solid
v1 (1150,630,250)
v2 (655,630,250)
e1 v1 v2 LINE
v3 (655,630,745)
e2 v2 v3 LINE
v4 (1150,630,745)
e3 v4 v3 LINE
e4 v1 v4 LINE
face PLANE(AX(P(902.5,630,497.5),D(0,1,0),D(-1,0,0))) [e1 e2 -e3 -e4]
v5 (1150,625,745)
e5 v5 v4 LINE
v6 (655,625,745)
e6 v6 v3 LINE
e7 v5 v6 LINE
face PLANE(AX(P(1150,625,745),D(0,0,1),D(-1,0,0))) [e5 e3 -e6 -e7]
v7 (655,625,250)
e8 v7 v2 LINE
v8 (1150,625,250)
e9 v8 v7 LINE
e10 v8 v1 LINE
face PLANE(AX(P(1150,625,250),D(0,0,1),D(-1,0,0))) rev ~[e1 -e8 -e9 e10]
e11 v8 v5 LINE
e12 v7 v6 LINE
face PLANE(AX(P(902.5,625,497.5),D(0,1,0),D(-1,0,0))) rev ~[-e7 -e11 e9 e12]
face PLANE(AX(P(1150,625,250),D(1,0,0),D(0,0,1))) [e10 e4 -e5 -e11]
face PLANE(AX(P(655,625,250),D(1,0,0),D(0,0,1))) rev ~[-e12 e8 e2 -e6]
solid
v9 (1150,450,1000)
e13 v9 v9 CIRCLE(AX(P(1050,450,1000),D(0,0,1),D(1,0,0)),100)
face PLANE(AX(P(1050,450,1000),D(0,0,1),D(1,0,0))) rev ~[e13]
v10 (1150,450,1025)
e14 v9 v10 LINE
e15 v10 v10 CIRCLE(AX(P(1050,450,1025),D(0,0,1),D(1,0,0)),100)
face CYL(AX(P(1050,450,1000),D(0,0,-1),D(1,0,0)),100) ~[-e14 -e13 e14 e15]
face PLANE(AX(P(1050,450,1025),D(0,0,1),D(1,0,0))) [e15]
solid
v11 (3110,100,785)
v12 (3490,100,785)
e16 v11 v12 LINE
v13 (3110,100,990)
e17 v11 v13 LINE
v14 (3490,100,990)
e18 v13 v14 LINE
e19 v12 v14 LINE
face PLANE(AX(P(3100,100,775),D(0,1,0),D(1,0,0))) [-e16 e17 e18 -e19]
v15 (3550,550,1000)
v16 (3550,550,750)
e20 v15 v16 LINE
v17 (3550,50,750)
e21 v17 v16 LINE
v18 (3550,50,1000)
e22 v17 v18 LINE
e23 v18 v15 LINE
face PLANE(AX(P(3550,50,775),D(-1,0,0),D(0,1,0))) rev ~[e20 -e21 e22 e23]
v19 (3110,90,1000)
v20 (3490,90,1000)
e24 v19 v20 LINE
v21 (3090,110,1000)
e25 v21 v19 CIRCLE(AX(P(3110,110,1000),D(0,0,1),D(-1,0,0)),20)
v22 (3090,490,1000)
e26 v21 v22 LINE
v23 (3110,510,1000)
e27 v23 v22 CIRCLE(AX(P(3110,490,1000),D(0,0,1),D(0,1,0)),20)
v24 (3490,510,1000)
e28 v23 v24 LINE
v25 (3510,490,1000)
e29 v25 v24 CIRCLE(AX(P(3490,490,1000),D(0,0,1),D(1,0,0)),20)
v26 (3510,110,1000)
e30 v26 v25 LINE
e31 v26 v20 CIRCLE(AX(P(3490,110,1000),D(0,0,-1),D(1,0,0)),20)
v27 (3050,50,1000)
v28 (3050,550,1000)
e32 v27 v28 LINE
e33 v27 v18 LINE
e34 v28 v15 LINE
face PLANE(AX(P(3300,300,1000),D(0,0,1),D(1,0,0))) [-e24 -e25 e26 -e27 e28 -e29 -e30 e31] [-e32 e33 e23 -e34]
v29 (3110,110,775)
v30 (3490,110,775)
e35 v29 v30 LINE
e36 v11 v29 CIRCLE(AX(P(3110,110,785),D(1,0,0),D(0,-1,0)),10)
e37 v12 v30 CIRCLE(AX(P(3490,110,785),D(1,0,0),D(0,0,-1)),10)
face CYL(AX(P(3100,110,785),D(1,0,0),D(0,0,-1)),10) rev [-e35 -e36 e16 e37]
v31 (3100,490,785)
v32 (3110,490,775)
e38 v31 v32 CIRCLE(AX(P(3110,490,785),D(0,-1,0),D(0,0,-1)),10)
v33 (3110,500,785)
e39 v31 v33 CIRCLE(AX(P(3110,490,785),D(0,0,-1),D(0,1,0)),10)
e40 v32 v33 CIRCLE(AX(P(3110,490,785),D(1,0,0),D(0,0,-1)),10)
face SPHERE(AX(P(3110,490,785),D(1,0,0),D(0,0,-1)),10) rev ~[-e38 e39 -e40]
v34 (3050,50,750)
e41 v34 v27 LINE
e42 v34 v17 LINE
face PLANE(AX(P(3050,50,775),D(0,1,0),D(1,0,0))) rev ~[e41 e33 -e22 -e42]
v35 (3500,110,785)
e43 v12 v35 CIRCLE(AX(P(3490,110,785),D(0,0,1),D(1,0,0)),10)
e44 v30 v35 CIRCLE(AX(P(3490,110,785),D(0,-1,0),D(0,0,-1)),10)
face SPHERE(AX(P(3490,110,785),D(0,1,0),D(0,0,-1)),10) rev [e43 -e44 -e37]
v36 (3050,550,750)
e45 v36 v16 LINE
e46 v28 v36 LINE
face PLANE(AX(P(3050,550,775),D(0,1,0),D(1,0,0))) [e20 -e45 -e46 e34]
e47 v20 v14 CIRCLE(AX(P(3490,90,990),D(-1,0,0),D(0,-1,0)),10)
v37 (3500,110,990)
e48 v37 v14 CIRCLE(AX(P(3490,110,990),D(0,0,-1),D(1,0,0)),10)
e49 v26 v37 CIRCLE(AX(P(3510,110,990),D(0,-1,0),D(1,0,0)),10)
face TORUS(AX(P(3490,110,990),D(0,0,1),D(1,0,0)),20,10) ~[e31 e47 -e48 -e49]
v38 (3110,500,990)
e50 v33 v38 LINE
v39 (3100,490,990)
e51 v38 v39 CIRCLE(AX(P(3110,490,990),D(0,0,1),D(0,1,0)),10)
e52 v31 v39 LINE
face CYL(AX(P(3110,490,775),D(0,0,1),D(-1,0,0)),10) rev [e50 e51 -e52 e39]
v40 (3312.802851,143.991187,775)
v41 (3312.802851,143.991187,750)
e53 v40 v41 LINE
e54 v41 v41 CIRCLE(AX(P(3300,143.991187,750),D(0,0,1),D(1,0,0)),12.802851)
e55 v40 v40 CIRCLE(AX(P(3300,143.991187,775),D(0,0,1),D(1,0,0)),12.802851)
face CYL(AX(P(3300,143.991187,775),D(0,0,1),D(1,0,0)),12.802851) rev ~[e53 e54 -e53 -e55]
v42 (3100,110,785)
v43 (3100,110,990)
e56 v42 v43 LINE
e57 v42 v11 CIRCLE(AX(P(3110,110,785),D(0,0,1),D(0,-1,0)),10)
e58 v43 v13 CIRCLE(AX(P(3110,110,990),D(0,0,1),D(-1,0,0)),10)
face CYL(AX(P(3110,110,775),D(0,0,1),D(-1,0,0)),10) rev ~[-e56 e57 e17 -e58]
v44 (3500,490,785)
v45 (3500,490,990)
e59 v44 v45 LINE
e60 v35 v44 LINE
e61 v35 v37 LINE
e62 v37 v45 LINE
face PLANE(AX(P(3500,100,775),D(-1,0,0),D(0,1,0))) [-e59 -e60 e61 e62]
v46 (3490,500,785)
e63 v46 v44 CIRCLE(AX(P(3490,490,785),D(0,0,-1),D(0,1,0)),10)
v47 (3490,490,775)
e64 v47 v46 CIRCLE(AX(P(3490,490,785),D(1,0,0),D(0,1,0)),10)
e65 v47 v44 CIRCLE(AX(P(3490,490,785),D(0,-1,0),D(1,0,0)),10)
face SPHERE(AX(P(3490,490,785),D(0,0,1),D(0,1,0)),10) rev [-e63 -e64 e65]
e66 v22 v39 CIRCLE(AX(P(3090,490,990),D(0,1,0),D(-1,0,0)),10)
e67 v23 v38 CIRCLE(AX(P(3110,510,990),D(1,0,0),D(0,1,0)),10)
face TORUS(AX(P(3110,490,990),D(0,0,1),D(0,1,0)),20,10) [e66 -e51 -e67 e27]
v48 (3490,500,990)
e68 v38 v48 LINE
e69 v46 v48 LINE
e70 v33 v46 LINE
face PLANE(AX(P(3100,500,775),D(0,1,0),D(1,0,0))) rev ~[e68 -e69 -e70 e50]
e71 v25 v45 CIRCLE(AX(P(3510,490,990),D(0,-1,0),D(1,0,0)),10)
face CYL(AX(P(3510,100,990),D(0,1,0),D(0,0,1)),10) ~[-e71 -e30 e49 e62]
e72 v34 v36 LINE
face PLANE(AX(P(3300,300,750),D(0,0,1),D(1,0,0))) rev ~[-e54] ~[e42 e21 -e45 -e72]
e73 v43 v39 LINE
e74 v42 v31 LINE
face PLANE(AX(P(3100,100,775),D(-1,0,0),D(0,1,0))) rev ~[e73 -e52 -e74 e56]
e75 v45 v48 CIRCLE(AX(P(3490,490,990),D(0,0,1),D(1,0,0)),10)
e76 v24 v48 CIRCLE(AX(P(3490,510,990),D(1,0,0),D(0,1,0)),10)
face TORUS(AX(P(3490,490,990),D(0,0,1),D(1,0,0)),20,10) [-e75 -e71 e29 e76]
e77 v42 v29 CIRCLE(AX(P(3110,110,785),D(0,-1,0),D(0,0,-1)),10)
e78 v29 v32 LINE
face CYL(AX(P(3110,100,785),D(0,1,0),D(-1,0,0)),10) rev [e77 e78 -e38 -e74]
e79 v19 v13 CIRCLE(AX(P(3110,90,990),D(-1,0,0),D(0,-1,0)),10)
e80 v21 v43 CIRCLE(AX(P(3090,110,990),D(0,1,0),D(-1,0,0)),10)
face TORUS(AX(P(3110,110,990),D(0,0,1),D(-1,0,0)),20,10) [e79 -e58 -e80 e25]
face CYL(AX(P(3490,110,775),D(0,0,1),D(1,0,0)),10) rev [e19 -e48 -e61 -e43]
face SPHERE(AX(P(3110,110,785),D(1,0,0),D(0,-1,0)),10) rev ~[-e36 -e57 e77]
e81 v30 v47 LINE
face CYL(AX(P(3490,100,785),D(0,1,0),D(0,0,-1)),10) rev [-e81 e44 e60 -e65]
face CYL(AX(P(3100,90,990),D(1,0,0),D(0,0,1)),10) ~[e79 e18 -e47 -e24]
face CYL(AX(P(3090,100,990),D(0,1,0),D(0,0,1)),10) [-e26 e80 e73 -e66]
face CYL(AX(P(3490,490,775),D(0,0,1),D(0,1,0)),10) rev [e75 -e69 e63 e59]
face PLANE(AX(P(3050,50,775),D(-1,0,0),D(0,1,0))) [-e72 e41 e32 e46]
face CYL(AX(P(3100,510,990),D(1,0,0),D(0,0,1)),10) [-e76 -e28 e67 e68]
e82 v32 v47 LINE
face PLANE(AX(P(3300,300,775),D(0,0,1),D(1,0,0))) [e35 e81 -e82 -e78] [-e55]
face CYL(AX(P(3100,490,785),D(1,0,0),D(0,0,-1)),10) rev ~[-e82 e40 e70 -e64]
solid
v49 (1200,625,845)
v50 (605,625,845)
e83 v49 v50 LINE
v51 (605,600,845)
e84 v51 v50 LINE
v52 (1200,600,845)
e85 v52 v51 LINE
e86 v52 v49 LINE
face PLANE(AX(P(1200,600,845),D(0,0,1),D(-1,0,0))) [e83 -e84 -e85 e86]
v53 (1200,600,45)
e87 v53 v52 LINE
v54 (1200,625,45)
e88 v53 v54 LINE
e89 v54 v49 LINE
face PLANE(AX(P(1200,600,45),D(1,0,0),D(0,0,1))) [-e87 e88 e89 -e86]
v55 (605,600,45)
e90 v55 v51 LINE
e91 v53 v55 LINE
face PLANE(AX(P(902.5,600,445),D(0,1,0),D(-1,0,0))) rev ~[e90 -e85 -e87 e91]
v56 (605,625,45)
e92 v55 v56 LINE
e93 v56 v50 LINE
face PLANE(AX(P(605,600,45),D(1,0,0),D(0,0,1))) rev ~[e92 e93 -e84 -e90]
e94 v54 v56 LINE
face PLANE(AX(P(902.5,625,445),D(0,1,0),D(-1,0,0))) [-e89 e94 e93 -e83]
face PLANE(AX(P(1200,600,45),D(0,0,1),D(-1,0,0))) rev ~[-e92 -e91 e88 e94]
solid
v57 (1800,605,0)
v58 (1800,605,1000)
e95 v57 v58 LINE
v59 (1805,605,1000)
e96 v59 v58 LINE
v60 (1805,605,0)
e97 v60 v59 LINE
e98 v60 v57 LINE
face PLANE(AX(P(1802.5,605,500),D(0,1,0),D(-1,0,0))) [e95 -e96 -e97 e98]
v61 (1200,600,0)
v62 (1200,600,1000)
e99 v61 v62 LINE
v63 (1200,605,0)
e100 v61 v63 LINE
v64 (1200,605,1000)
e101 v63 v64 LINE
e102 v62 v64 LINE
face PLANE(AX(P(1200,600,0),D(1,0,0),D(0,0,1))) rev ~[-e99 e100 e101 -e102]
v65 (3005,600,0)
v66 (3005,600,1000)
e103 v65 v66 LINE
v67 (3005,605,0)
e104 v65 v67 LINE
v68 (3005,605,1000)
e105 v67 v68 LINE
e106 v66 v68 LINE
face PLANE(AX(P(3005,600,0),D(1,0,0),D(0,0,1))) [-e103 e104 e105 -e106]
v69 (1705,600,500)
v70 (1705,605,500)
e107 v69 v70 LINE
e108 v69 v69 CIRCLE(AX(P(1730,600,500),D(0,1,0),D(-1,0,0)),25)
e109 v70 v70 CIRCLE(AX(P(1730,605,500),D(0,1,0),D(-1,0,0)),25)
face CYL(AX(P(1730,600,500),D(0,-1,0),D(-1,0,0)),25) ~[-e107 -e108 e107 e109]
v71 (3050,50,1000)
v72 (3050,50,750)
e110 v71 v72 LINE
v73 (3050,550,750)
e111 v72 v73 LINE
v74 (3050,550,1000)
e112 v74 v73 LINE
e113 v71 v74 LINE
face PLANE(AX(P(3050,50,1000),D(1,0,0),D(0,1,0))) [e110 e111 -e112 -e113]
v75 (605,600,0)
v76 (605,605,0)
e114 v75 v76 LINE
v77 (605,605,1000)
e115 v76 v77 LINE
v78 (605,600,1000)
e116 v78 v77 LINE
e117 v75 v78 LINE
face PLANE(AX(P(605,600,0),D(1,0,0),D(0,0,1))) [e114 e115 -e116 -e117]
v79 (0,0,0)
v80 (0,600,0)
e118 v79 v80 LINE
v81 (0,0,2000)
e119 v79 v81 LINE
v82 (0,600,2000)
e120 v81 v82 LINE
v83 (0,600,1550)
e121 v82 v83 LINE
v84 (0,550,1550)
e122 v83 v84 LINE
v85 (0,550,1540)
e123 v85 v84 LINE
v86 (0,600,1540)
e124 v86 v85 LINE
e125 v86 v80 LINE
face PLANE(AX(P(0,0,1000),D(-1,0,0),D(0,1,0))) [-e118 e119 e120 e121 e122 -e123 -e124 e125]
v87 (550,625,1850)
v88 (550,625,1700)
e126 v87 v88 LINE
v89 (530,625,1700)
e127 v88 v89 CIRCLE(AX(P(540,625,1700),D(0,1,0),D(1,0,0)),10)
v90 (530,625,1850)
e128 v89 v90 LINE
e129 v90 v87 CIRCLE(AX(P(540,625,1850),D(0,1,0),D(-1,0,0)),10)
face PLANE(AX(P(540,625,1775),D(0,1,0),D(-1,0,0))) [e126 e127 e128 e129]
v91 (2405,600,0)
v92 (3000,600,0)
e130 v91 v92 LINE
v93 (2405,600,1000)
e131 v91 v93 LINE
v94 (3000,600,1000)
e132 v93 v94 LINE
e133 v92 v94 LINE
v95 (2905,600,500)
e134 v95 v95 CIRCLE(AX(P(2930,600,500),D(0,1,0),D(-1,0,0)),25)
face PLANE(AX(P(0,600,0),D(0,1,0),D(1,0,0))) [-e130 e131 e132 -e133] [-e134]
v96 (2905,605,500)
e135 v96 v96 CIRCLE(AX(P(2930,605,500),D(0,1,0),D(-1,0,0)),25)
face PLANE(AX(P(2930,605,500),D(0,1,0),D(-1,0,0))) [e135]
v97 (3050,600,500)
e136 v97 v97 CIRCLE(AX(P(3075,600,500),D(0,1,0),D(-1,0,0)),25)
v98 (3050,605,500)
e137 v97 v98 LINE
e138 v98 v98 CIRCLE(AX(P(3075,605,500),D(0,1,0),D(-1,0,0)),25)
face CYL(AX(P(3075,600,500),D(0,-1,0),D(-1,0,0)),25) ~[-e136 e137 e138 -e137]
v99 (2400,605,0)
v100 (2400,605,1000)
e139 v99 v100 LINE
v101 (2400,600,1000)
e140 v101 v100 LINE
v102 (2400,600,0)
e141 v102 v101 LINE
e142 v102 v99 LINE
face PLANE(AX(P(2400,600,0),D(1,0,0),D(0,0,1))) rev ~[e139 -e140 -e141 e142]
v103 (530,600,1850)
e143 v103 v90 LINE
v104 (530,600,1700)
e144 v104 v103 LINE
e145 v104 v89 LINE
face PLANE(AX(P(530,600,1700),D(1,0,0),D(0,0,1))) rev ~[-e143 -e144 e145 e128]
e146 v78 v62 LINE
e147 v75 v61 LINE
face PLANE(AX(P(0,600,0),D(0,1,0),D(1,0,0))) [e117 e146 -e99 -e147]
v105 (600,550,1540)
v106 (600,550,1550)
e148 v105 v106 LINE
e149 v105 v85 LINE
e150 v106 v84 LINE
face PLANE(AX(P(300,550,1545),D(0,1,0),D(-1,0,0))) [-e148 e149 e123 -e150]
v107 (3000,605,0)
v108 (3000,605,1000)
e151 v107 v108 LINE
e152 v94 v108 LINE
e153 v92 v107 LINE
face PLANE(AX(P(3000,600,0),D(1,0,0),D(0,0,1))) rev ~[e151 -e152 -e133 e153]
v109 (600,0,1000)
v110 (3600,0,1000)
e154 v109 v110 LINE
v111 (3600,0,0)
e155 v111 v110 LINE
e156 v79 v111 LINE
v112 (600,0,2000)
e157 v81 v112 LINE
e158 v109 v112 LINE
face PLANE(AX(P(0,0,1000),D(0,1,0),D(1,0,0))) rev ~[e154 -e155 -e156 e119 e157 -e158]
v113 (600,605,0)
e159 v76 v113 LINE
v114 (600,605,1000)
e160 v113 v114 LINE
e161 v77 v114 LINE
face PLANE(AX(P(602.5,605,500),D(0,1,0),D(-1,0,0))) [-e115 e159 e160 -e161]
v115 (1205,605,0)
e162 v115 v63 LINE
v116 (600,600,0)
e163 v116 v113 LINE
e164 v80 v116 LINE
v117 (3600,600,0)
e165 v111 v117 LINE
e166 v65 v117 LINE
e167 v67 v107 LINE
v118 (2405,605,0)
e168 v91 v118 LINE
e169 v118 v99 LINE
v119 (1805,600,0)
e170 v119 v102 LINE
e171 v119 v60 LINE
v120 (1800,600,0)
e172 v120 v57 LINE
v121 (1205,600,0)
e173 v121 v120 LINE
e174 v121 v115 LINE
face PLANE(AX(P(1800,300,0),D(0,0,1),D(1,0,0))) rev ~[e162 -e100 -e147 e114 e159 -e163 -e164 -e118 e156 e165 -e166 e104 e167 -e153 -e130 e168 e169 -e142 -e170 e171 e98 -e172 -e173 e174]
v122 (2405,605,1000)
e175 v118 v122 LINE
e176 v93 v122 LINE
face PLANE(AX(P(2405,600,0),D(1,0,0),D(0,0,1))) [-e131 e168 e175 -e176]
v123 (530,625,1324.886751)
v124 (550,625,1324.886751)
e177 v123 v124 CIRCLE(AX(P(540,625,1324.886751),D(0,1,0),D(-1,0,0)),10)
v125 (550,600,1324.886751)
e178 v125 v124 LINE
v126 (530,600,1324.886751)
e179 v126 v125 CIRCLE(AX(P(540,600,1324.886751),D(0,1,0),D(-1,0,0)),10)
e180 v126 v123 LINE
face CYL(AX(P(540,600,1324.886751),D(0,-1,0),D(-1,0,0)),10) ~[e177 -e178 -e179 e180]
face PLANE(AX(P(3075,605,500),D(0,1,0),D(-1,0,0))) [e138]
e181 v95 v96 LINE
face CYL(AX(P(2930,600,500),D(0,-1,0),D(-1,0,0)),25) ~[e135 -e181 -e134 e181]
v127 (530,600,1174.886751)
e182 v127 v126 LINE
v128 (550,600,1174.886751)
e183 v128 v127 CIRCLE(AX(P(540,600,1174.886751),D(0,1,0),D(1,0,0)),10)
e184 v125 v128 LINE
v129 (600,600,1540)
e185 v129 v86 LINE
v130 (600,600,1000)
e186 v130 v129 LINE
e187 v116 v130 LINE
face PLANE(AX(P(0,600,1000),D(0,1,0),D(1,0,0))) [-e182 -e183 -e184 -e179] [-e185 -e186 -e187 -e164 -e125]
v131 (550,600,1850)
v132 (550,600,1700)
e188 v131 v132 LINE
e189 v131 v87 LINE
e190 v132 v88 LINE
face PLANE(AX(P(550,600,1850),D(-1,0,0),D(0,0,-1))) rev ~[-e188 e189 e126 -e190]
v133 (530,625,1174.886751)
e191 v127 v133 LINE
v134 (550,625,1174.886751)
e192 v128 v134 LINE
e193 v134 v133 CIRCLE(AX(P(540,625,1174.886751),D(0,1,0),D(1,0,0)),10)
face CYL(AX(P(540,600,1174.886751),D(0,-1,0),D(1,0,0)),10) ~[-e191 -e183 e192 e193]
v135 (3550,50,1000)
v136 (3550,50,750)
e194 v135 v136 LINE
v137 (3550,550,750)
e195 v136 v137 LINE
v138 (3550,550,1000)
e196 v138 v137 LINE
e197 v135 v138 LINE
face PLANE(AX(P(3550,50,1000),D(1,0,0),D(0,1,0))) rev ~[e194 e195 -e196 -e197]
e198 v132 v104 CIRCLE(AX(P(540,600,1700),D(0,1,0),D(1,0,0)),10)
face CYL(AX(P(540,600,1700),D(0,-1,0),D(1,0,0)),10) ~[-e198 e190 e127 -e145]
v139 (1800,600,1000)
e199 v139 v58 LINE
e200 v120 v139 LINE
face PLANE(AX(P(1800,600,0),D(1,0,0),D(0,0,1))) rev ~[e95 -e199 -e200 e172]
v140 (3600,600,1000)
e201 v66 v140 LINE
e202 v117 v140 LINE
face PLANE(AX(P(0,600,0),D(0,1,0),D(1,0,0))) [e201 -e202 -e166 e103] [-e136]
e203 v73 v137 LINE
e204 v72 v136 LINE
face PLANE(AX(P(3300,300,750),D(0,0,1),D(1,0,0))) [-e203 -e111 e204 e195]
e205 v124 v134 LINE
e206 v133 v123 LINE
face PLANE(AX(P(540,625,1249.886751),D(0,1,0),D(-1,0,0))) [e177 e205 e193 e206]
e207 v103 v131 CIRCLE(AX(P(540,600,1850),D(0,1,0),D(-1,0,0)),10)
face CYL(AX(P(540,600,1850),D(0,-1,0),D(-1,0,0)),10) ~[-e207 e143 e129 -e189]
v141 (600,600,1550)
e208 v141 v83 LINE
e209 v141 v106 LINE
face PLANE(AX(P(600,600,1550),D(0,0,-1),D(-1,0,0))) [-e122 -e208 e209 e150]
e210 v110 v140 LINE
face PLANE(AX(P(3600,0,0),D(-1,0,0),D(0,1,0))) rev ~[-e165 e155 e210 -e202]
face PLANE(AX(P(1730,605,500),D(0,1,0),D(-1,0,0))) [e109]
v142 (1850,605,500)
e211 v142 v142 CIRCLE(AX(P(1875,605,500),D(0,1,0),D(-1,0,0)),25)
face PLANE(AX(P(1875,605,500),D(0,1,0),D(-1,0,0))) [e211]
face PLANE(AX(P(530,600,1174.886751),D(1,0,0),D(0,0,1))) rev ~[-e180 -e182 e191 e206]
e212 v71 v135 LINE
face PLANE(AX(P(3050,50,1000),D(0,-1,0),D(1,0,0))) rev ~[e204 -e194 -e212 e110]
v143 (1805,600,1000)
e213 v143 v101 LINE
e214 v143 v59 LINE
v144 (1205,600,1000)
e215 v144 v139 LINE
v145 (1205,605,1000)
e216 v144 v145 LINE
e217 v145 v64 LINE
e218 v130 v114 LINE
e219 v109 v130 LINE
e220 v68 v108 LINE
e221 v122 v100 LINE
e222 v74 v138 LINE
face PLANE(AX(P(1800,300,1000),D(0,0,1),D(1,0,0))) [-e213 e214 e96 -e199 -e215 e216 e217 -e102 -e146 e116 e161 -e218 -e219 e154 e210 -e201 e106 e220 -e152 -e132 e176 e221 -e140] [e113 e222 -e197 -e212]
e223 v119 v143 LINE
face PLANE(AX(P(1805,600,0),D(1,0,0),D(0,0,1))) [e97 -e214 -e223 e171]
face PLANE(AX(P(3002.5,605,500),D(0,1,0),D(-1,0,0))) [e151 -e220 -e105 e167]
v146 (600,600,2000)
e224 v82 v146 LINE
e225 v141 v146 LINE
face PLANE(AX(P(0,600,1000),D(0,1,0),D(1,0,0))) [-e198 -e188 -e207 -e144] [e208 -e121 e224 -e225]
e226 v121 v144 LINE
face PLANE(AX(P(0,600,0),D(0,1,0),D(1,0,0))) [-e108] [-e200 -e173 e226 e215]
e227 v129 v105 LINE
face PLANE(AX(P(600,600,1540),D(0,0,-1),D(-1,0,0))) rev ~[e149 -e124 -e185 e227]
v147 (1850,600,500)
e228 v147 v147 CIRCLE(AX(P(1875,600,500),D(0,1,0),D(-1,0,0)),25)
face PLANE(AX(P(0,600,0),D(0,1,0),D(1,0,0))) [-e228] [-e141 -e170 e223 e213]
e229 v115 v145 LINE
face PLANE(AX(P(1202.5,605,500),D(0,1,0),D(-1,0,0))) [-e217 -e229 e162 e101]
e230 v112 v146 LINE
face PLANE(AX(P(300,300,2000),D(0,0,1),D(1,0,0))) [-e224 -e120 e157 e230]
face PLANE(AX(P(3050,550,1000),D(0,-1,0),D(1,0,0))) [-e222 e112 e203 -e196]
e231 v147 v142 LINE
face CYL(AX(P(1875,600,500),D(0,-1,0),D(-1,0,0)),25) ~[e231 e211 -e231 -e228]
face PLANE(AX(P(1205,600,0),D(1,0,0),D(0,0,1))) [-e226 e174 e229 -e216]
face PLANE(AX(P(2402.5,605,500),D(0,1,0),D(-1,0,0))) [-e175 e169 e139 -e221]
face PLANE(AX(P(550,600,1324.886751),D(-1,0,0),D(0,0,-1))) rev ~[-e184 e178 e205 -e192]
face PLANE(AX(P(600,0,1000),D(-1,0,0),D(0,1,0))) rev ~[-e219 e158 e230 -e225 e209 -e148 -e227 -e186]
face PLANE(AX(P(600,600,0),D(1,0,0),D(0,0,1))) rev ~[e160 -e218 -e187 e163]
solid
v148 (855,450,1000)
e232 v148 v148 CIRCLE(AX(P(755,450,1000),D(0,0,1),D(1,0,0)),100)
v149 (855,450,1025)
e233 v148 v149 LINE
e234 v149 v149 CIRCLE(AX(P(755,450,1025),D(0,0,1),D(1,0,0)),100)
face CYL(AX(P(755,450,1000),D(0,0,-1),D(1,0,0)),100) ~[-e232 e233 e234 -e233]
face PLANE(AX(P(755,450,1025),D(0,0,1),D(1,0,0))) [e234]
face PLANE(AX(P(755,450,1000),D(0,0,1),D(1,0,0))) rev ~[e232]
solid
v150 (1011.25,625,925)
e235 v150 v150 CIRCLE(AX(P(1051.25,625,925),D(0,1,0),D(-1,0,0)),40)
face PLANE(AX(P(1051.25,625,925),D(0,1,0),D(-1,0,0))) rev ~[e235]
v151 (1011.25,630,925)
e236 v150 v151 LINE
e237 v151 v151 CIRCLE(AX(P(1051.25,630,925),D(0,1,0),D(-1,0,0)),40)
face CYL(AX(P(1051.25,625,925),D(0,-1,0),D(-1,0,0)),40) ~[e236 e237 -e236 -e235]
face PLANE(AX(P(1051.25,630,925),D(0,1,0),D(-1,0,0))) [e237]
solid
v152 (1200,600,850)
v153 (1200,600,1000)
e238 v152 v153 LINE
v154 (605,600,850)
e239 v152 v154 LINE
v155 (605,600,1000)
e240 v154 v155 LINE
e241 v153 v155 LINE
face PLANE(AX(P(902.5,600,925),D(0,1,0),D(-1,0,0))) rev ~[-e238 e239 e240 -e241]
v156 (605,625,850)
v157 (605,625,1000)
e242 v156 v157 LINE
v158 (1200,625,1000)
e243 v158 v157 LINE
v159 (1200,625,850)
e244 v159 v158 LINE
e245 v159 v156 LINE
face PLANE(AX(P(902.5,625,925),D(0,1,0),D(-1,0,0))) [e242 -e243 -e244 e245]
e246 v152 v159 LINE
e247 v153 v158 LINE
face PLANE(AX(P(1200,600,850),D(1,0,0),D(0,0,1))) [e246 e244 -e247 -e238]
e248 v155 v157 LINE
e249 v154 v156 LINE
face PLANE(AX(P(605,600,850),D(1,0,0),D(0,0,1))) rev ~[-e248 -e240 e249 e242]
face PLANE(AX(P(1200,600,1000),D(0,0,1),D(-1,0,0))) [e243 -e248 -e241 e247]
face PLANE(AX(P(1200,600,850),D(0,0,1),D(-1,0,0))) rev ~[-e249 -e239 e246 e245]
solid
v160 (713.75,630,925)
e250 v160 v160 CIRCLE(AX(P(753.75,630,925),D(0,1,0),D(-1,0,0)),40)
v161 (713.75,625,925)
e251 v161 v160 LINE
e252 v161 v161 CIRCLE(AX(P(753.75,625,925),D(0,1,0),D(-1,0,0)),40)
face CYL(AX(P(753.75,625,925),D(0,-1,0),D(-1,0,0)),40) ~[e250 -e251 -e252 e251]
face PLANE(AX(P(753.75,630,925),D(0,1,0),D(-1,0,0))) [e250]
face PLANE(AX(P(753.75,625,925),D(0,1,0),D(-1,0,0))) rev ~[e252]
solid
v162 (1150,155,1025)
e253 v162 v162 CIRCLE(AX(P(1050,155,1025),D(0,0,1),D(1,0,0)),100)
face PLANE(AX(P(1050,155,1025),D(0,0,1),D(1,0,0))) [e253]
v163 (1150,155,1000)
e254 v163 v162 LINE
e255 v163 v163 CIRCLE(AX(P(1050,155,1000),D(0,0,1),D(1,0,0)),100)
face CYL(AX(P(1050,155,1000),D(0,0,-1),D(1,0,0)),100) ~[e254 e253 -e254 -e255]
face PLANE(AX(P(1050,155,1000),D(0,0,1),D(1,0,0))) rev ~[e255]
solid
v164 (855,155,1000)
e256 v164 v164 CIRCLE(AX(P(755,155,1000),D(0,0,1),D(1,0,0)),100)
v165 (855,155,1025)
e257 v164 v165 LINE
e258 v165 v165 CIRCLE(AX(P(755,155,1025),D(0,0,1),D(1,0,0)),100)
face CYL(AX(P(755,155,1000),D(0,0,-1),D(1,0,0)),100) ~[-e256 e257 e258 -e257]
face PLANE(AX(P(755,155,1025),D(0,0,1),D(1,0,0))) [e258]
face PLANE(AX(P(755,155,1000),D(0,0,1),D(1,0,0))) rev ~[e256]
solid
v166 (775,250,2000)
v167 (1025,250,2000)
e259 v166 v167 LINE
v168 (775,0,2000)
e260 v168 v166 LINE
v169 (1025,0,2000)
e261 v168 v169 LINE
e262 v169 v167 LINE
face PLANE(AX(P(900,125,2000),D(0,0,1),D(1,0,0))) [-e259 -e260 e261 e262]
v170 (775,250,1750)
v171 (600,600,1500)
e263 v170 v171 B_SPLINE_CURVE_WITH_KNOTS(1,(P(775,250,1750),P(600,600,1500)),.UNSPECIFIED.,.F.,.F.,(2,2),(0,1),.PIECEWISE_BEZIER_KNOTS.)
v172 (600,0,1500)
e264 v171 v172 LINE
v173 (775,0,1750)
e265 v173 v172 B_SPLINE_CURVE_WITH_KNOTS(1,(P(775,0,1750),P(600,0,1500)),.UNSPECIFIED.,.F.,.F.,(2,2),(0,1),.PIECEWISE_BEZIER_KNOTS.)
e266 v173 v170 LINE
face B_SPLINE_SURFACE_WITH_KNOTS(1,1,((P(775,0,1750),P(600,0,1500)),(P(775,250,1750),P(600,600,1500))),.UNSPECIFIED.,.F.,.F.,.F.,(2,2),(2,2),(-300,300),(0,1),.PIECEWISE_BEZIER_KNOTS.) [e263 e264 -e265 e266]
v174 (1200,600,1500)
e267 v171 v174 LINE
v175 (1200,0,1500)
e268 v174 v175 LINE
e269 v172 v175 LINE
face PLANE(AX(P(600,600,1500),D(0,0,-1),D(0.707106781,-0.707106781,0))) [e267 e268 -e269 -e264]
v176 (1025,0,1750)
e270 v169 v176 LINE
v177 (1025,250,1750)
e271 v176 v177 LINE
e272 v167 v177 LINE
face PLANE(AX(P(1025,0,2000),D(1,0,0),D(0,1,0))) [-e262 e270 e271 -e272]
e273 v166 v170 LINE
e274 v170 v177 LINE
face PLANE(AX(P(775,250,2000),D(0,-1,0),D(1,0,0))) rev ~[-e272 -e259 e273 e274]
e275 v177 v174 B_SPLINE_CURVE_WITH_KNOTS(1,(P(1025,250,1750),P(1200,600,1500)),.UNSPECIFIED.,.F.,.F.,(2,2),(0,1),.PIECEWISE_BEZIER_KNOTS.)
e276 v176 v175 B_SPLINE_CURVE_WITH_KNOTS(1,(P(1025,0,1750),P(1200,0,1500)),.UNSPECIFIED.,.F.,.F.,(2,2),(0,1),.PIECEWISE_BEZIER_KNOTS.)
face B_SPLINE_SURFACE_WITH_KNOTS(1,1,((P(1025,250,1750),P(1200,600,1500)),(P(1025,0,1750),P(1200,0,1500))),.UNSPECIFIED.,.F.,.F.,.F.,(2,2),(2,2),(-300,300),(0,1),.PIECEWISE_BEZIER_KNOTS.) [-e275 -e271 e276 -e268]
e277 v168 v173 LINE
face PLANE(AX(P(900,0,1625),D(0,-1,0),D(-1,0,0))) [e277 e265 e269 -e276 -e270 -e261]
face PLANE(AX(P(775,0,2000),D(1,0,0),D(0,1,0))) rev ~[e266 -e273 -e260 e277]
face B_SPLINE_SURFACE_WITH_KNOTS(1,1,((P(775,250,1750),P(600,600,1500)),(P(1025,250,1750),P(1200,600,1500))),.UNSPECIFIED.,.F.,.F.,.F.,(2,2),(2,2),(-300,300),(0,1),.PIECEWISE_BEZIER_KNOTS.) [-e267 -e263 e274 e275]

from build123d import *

# Parameters (mm, degrees)
F0_W       = 3600
F0_H       = 600
F1_DEPTH   = 1000
F2_W       = 500
F2_H       = 500
F3_DEPTH   = 250
F4_W       = 500
F4_H       = 500
F5_DEPTH   = 25
F6_W       = 500
F6_H       = 500
F6_W_2     = 400
F6_H_2     = 400
F7_DEPTH   = 225
F8_R       = 10
F9_R       = 12.8028507665
F10_DEPTH  = 25
F11_W      = 5
F11_H      = 1000
F11_R      = 25
F12_DEPTH  = 5
F13_R      = 100
F14_DEPTH  = 25
F15_W      = 595
F15_H      = 150
F16_DEPTH  = 25
F15_H_2    = 800
F17_W      = 495
F17_H      = 495
F18_DEPTH  = 5
F17_R      = 40
F19_W      = 600
F19_H      = 600
F20_DEPTH  = 1000
F21_W      = 600
F21_H      = 10
F22_DEPTH  = 50
F24_DEPTH  = 25
F25_W      = 250
F25_H      = 250
F26_DEPTH  = 250
F26_FACE_W = 250
F26_FACE_H = 250
F28_W      = 600
F28_H      = 600


with BuildPart() as f1:
    # F0 (on Top) → F1 (new body)
    with BuildSketch(Plane.XY):
        with Locations((1800, 300)):
            Rectangle(F0_W, F0_H)
    extrude(amount=F1_DEPTH)

    # F2 (on face) → F3 (cut)
    with BuildSketch(Plane.XY.offset(1000)):
        with Locations((3300, 300)):
            Rectangle(F2_W, F2_H)
    extrude(amount=-F3_DEPTH, mode=Mode.SUBTRACT)

    # F11 (on face) → F12 (join)
    with BuildSketch(Plane(origin=(0, 600, 0), x_dir=(-1, 0, 0), z_dir=(0, 1, 0))):
        with Locations((-3002.5, 500)):
            Rectangle(F11_W, F11_H)
        with Locations((-2402.5, 500)):
            Rectangle(F11_W, F11_H)
        with Locations((-1802.5, 500)):
            Rectangle(F11_W, F11_H)
        with Locations((-1202.5, 500)):
            Rectangle(F11_W, F11_H)
        with Locations((-602.5, 500)):
            Rectangle(F11_W, F11_H)
        with Locations((-3075, 500)):
            Circle(F11_R)
        with Locations((-2930, 500)):
            Circle(F11_R)
        with Locations((-1730, 500)):
            Circle(F11_R)
        with Locations((-1875, 500)):
            Circle(F11_R)
    extrude(amount=F12_DEPTH)

    # F19 (on face) → F20 (join)
    with BuildSketch(Plane.XY.offset(1000)):
        with Locations((300, 300)):
            Rectangle(F19_W, F19_H)
    extrude(amount=F20_DEPTH)

    # F21 (on face) → F22 (cut)
    with BuildSketch(Plane(origin=(0, 600, 0), x_dir=(-1, 0, 0), z_dir=(0, 1, 0))):
        with Locations((-300, 1545)):
            Rectangle(F21_W, F21_H)
    extrude(amount=-F22_DEPTH, mode=Mode.SUBTRACT)

    # F23 (on face) → F24 (join)
    with BuildSketch(Plane(origin=(0, 600, 0), x_dir=(-1, 0, 0), z_dir=(0, 1, 0))):
        with BuildLine():
            Line((-550, 1850), (-550, 1775))
            Line((-550, 1775), (-550, 1700))
            ThreePointArc((-550, 1700), (-540, 1690), (-530, 1700))
            Line((-530, 1700), (-530, 1775))
            Line((-530, 1775), (-530, 1850))
            ThreePointArc((-530, 1850), (-540, 1860), (-550, 1850))
        make_face()
        with BuildLine():
            Line((-550, 1324.8867511749), (-550, 1249.8867511749))
            Line((-550, 1249.8867511749), (-550, 1174.8867511749))
            ThreePointArc((-550, 1174.8867511749), (-540, 1164.8867511749), (-530, 1174.8867511749))
            Line((-530, 1174.8867511749), (-530, 1249.8867511749))
            Line((-530, 1249.8867511749), (-530, 1324.8867511749))
            ThreePointArc((-530, 1324.8867511749), (-540, 1334.8867511749), (-550, 1324.8867511749))
        make_face()
    extrude(amount=F24_DEPTH)


with BuildPart() as f5:
    # F4 (on face) → F5 (new body)
    with BuildSketch(Plane.XY.offset(750)):
        with Locations((3300, 300)):
            Rectangle(F4_W, F4_H)
    extrude(amount=F5_DEPTH)

    # F6 (on face) → F7 (join, through all)
    with BuildSketch(Plane.XY.offset(775)):
        with Locations((3300, 300)):
            Rectangle(F6_W, F6_H)
        with Locations((3300, 300)):
            Rectangle(F6_W_2, F6_H_2, mode=Mode.SUBTRACT)
    extrude(amount=F7_DEPTH)

    # F8
    f8_edges = [f5.edges().sort_by_distance(p)[0] for p in [
        (3500, 300, 1000),
        (3300, 500, 1000),
        (3100, 300, 1000),
        (3300, 100, 1000),
        (3500, 500, 887.5),
        (3300, 500, 775),
        (3500, 300, 775),
        (3300, 100, 775),
        (3500, 100, 887.5),
        (3100, 100, 887.5),
        (3100, 300, 775),
        (3100, 500, 887.5),
    ]]
    fillet(f8_edges, radius=F8_R)

    # F9 (on face) → F10 (cut)
    with BuildSketch(Plane.XY.offset(775)):
        with Locations((3300, 143.9911872149)):
            Circle(F9_R)
    extrude(amount=-F10_DEPTH, mode=Mode.SUBTRACT)


with BuildPart() as f14:
    # F13 (on face) → F14 (new body)
    with BuildSketch(Plane.XY.offset(1000)):
        with Locations((1050, 155)):
            Circle(F13_R)
    extrude(amount=F14_DEPTH)


with BuildPart() as f14b:
    # F13 (on face) → F14, piece 2 (new body)
    with BuildSketch(Plane.XY.offset(1000)):
        with Locations((755, 155)):
            Circle(F13_R)
    extrude(amount=F14_DEPTH)


with BuildPart() as f14c:
    # F13 (on face) → F14, piece 3 (new body)
    with BuildSketch(Plane.XY.offset(1000)):
        with Locations((755, 450)):
            Circle(F13_R)
    extrude(amount=F14_DEPTH)


with BuildPart() as f14d:
    # F13 (on face) → F14, piece 4 (new body)
    with BuildSketch(Plane.XY.offset(1000)):
        with Locations((1050, 450)):
            Circle(F13_R)
    extrude(amount=F14_DEPTH)


with BuildPart() as f16:
    # F15 (on face) → F16 (new body)
    with BuildSketch(Plane(origin=(0, 600, 0), x_dir=(-1, 0, 0), z_dir=(0, 1, 0))):
        with Locations((-902.5, 925)):
            Rectangle(F15_W, F15_H)
    extrude(amount=F16_DEPTH)


with BuildPart() as f16b:
    # F15 (on face) → F16, piece 2 (new body)
    with BuildSketch(Plane(origin=(0, 600, 0), x_dir=(-1, 0, 0), z_dir=(0, 1, 0))):
        with Locations((-902.5, 445)):
            Rectangle(F15_W, F15_H_2)
    extrude(amount=F16_DEPTH)


with BuildPart() as f18:
    # F17 (on face) → F18 (new body)
    with BuildSketch(Plane(origin=(0, 625, 0), x_dir=(-1, 0, 0), z_dir=(0, 1, 0))):
        with Locations((-902.5, 497.5)):
            Rectangle(F17_W, F17_H)
    extrude(amount=F18_DEPTH)


with BuildPart() as f18b:
    # F17 (on face) → F18, piece 2 (new body)
    with BuildSketch(Plane(origin=(0, 625, 0), x_dir=(-1, 0, 0), z_dir=(0, 1, 0))):
        with Locations((-753.75, 925)):
            Circle(F17_R)
    extrude(amount=F18_DEPTH)


with BuildPart() as f18c:
    # F17 (on face) → F18, piece 3 (new body)
    with BuildSketch(Plane(origin=(0, 625, 0), x_dir=(-1, 0, 0), z_dir=(0, 1, 0))):
        with Locations((-1051.25, 925)):
            Circle(F17_R)
    extrude(amount=F18_DEPTH)


with BuildPart() as f26:
    # F25 (on face) → F26 (new body)
    with BuildSketch(Plane.XY.offset(2000)):
        with Locations((900, 125)):
            Rectangle(F25_W, F25_H)
    extrude(amount=-F26_DEPTH)

    # F26_face (on face) → F29 section 0
    with BuildSketch(Plane(origin=(900, 125, 1750), x_dir=(1, 0, 0), z_dir=(0, 0, -1))):
        Rectangle(F26_FACE_W, F26_FACE_H)
    # F28 (on offset) → F29 section 1
    with BuildSketch(Plane(origin=(0, 0, 1500), x_dir=(1, 0, 0), z_dir=(0, 0, -1))):
        with Locations((900, -300)):
            Rectangle(F28_W, F28_H)
    loft()


solid = Compound([f1.part, f5.part, f14.part, f14b.part, f14c.part, f14d.part, f16.part, f16b.part, f18.part, f18b.part, f18c.part, f26.part])
